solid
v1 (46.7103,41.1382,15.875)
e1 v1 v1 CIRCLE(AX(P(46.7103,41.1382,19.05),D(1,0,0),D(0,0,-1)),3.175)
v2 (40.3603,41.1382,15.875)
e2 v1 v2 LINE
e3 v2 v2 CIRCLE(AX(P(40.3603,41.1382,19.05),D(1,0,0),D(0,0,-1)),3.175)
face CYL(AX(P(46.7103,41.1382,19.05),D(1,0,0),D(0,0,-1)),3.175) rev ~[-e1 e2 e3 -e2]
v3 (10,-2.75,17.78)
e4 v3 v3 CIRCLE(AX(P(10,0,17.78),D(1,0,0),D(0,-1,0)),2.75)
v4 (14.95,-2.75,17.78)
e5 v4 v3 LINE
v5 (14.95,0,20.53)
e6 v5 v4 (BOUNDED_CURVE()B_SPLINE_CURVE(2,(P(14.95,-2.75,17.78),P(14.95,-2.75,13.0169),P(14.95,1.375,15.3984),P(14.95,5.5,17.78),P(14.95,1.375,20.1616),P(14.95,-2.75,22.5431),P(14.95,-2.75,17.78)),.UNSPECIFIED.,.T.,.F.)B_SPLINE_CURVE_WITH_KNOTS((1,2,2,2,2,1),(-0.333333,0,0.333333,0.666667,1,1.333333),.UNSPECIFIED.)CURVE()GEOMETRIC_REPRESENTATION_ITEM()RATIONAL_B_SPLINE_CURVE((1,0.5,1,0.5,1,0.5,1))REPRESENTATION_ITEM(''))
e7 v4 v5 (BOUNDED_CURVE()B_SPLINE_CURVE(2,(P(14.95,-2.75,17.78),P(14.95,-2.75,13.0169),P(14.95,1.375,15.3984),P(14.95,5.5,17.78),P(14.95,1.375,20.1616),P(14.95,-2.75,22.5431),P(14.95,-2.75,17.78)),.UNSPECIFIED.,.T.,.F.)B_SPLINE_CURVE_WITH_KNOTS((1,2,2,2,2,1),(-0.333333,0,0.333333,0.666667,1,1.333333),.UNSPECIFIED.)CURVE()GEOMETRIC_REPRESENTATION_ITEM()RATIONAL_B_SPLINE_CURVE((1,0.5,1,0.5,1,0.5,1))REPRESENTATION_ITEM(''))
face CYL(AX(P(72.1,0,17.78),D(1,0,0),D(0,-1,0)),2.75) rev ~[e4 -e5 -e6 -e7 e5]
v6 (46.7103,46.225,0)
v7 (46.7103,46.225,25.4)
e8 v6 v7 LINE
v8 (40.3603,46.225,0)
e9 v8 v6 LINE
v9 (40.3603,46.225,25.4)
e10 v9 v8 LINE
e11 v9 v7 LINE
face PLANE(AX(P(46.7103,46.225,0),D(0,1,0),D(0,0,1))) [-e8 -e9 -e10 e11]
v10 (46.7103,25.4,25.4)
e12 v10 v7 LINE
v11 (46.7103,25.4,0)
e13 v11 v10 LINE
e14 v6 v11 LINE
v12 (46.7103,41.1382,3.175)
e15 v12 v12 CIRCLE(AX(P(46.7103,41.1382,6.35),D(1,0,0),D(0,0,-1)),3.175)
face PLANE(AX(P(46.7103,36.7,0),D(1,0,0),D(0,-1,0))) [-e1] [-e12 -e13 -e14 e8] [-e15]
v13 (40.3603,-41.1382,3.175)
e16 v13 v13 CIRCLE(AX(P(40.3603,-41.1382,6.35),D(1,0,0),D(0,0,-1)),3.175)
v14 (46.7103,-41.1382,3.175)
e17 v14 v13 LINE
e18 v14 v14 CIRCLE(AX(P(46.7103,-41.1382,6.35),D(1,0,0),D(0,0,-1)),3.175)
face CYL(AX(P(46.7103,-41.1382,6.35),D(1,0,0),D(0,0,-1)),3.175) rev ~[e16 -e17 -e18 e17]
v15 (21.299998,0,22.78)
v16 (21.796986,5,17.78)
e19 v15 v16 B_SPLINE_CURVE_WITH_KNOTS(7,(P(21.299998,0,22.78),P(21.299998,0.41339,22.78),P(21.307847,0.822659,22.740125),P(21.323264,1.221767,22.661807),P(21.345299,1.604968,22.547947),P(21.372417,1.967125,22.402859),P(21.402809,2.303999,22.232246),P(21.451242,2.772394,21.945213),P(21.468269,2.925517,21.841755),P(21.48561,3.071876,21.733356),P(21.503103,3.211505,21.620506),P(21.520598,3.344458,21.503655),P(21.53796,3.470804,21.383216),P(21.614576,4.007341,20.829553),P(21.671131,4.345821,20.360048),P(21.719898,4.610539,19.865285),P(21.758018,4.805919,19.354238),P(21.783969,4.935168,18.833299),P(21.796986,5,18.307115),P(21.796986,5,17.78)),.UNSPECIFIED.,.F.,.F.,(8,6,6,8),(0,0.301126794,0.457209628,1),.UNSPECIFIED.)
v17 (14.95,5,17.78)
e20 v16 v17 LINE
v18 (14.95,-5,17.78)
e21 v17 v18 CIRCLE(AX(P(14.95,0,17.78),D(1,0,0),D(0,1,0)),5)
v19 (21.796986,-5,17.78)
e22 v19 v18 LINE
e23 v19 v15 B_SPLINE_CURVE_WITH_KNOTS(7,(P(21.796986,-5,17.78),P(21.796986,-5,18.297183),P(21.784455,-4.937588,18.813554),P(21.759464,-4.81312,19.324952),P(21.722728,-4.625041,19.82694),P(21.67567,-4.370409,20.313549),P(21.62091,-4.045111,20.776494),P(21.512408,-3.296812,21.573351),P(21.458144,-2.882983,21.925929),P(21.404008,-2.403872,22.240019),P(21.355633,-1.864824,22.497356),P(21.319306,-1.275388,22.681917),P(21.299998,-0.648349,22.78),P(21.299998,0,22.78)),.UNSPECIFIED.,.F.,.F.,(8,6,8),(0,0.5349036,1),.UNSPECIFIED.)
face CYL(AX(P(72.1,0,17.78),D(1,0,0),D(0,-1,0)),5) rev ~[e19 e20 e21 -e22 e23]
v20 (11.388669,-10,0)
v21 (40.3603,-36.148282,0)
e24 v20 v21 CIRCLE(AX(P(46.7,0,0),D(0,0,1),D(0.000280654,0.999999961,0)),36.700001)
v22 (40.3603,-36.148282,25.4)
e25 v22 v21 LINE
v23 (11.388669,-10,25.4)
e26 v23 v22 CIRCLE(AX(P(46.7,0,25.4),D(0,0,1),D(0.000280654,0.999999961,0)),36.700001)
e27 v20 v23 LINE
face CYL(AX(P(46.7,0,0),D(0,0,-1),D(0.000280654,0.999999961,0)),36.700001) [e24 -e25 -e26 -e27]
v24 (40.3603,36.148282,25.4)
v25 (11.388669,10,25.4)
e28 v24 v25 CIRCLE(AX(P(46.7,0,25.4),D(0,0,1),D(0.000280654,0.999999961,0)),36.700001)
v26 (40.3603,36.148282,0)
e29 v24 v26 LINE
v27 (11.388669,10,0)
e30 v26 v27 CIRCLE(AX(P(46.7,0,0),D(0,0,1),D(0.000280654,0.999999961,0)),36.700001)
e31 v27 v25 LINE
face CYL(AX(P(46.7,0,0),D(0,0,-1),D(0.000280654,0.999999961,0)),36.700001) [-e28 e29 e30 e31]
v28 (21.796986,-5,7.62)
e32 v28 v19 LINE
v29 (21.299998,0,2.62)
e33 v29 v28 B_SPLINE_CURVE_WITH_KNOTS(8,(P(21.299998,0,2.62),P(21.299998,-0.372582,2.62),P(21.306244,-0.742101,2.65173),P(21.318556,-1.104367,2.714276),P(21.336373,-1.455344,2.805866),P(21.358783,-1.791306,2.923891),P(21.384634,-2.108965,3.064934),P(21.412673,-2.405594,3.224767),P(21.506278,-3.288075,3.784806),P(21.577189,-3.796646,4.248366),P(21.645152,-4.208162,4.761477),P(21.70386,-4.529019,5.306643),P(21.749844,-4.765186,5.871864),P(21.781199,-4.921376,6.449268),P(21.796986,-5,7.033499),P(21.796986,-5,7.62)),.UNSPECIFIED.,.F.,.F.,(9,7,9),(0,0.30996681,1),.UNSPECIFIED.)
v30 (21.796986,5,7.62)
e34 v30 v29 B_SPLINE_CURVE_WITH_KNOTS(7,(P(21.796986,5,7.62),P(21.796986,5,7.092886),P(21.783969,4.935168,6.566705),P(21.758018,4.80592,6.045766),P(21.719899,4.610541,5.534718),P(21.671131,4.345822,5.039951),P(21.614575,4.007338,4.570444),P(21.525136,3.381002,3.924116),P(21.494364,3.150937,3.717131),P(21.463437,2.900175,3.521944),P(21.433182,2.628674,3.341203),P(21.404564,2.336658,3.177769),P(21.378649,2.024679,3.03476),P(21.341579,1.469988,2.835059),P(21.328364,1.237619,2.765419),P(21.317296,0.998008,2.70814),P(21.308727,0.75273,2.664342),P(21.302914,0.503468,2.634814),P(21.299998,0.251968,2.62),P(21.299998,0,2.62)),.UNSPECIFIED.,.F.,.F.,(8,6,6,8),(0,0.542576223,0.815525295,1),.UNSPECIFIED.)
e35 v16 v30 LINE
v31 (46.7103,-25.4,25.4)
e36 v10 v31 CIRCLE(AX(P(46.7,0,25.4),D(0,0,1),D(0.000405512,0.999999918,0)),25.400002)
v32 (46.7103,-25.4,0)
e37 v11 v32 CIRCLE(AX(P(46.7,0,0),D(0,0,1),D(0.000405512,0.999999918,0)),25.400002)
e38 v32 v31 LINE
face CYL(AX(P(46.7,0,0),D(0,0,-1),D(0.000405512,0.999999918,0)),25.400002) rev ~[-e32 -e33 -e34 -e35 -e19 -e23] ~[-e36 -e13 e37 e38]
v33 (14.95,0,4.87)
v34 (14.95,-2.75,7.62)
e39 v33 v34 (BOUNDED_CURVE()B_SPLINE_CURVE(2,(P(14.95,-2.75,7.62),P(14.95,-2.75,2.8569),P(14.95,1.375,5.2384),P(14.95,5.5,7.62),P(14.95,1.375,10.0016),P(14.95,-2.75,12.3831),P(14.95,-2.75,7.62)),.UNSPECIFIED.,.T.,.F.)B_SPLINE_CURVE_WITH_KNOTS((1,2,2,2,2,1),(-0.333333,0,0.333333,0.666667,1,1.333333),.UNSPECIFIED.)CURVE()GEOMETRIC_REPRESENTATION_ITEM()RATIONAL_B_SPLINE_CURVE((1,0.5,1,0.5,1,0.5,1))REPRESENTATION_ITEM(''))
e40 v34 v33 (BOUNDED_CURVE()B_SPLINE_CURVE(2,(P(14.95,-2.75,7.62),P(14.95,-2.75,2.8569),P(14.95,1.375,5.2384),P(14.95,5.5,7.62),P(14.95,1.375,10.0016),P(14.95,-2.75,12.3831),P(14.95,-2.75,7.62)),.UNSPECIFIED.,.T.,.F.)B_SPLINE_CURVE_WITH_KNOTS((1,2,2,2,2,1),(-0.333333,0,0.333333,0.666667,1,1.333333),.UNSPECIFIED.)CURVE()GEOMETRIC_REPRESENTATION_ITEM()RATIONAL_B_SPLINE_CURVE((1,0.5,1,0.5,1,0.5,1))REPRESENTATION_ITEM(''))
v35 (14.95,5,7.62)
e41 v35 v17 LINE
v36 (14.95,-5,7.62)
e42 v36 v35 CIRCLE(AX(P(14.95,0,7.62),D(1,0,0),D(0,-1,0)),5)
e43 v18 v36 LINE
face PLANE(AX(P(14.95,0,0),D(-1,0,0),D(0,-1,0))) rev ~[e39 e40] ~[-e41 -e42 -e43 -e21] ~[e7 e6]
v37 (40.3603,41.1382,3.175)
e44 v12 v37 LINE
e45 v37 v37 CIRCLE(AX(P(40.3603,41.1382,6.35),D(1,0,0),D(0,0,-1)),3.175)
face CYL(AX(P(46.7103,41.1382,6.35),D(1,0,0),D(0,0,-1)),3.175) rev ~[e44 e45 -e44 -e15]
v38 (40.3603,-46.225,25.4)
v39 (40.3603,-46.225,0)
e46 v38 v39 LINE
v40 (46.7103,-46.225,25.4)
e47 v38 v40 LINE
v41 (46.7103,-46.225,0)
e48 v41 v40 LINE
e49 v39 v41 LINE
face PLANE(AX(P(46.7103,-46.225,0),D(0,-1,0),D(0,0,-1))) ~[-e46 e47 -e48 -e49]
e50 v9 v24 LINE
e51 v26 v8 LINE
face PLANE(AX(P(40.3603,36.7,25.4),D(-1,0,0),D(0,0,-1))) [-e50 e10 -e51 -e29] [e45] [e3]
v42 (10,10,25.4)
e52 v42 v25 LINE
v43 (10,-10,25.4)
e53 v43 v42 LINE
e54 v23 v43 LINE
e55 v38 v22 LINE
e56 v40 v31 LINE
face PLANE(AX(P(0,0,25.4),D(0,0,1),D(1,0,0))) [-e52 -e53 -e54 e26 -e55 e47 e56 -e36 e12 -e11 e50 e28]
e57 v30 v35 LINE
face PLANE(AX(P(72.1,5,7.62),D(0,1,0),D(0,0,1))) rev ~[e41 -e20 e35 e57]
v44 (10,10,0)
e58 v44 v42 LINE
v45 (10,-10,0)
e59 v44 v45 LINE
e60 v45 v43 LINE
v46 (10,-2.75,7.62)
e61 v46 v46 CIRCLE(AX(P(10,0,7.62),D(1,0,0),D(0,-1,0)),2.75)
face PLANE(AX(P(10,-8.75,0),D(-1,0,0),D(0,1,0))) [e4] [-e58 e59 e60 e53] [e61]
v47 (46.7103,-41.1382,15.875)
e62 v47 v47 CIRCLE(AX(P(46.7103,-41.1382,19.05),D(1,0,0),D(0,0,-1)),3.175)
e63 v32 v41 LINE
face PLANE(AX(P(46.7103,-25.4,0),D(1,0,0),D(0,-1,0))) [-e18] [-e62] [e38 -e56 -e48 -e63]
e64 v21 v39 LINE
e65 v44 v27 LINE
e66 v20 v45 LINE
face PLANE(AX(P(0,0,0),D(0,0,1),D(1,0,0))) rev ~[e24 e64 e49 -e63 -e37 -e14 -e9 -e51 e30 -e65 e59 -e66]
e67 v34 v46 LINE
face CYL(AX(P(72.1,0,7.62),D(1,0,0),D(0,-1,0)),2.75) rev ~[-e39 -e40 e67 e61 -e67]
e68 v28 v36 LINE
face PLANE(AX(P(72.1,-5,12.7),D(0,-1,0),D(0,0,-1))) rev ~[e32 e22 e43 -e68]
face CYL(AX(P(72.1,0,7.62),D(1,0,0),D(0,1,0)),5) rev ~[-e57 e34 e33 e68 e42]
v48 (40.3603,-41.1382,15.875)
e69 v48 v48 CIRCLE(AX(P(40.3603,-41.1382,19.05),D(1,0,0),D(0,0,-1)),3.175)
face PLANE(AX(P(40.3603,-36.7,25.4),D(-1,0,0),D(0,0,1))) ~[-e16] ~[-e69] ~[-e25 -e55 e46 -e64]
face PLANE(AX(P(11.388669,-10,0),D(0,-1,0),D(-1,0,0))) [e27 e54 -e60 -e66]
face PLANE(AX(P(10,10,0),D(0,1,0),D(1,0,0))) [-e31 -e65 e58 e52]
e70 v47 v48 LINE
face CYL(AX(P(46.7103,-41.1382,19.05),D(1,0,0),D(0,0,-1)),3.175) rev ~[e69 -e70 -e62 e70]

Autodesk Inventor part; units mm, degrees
sketch "Sketch1" plane through (0, 0, 0) normal (0, 0, 1) x (1, 0, 0)
  arc A0 (-10, -8.75) -> (-8.75, -10) centre (-8.75, -8.75) ccw projected
  line L0 (-8.75, -10) -> (-3.6, -10) projected
  line L1 (-3.6, -10) -> (-3.1, -9.5) projected
  line L2 (-3.1, -9.5) -> (-3.1, -8.4) projected
  line L3 (-3.1, -8.4) -> (-5.5, -8.4) projected
  line L4 (-5.5, -8.4) -> (-5.5, -6.466) projected
  line L5 (-5.5, -6.466) -> (-3.134, -4.1) projected
  line L6 (-3.134, -4.1) -> (3.134, -4.1) projected
  line L7 (3.134, -4.1) -> (5.5, -6.466) projected
  line L8 (5.5, -6.466) -> (5.5, -8.4) projected
  line L9 (5.5, -8.4) -> (3.1, -8.4) projected
  line L10 (3.1, -8.4) -> (3.1, -9.5) projected
  line L11 (3.1, -9.5) -> (3.6, -10) projected
  line L12 (3.6, -10) -> (8.75, -10) projected
  arc A1 (8.75, -10) -> (10, -8.75) centre (8.75, -8.75) ccw projected
  line L13 (10, -8.75) -> (10, -3.6) projected
  line L14 (10, -3.6) -> (9.5, -3.1) projected
  line L15 (9.5, -3.1) -> (8.4, -3.1) projected
  line L16 (8.4, -3.1) -> (8.4, -5.5) projected
  line L17 (8.4, -5.5) -> (6.466, -5.5) projected
  line L18 (6.466, -5.5) -> (4.1, -3.134) projected
  line L19 (4.1, -3.134) -> (4.1, 3.134) projected
  line L20 (4.1, 3.134) -> (6.466, 5.5) projected
  line L21 (6.466, 5.5) -> (8.4, 5.5) projected
  line L22 (8.4, 5.5) -> (8.4, 3.1) projected
  line L23 (8.4, 3.1) -> (9.5, 3.1) projected
  line L24 (9.5, 3.1) -> (10, 3.6) projected
  line L25 (10, 3.6) -> (10, 8.75) projected
  arc A2 (10, 8.75) -> (8.75, 10) centre (8.75, 8.75) ccw projected
  line L26 (8.75, 10) -> (3.6, 10) projected
  line L27 (3.6, 10) -> (3.1, 9.5) projected
  line L28 (3.1, 9.5) -> (3.1, 8.4) projected
  line L29 (3.1, 8.4) -> (5.5, 8.4) projected
  line L30 (5.5, 8.4) -> (5.5, 6.466) projected
  line L31 (5.5, 6.466) -> (3.134, 4.1) projected
  line L32 (3.134, 4.1) -> (-3.134, 4.1) projected
  line L33 (-3.134, 4.1) -> (-5.5, 6.466) projected
  line L34 (-5.5, 6.466) -> (-5.5, 8.4) projected
  line L35 (-5.5, 8.4) -> (-3.1, 8.4) projected
  line L36 (-3.1, 8.4) -> (-3.1, 9.5) projected
  line L37 (-3.1, 9.5) -> (-3.6, 10) projected
  line L38 (-3.6, 10) -> (-8.75, 10) projected
  arc A3 (-8.75, 10) -> (-10, 8.75) centre (-8.75, 8.75) ccw projected
  line L39 (-10, 8.75) -> (-10, 3.6) projected
  line L40 (-10, 3.6) -> (-9.5, 3.1) projected
  line L41 (-9.5, 3.1) -> (-8.4, 3.1) projected
  line L42 (-8.4, 3.1) -> (-8.4, 5.5) projected
  line L43 (-8.4, 5.5) -> (-6.466, 5.5) projected
  line L44 (-6.466, 5.5) -> (-4.1, 3.134) projected
  line L45 (-4.1, 3.134) -> (-4.1, -3.134) projected
  line L46 (-4.1, -3.134) -> (-6.466, -5.5) projected
  line L47 (-6.466, -5.5) -> (-8.4, -5.5) projected
  line L48 (-8.4, -5.5) -> (-8.4, -3.1) projected
  line L49 (-8.4, -3.1) -> (-9.5, -3.1) projected
  line L50 (-9.5, -3.1) -> (-10, -3.6) projected
  line L51 (-10, -3.6) -> (-10, -8.75) projected
  circle A4 centre (0, 0) radius 2.5 projected
  circle A5 centre (46.7, 0) radius 4.5 projected
  arc A6 (46.7103, 25.4) -> (46.7103, -25.4) centre (46.7, 0) ccw
  line L52 (10, 10) -> (16.35, 10)
  line L53 (16.35, 10) -> (16.35, -10)
  line L54 (16.35, -10) -> (10, -10)
  line L55 (10, -10) -> (10, 10)
  arc A7 (46.7103, 36.7) -> (46.7103, -36.7) centre (46.7, 0) ccw
  line L56 (46.7103, 36.7) -> (46.7103, 25.4)
  line L57 (46.7103, -25.4) -> (46.7103, -36.7)
  dimension "d0" = 50.8
  dimension "d1" = 20
  dimension "d2" = 6.35
extrude "Extrusion1" add sketch "Sketch1" along normal blind 25.4 contours L13 L55 A7 L54 | L55 L25 L52 A7 | A7 L52 L53 L54 | L54 L53 L52 A7 L56 A6 L57
ref_plane "Work Plane1" through (46.7103, 36.7, 0) normal (0, 1, 0) x (0, 0, 1)
sketch "Sketch2" plane through (46.7103, 36.7, 0) normal (0, 1, 0) x (0, 0, 1)
  line L0 (0, 0) -> (25.4, 0) projected
  line L1 (25.4, -35.3216) -> (25.4, 0) projected
  line L2 (0, 0) -> (25.4, 0)
  line L3 (25.4, 0) -> (25.4, -6.35)
  line L4 (25.4, -6.35) -> (0, -6.35)
  line L5 (0, -6.35) -> (0, 0)
  point P0 (0, -46.7103)
  dimension "d6" = 6.35
extrude "Extrusion2" add sketch "Sketch2" along normal mid plane 19.05
ref_plane "Work Plane2" through (10, 0, 0) normal (0, 1, 0) x (1, 0, 0)
mirror "Mirror1" about plane through (10, 0, 0) normal (0, 1, 0) of "Extrusion2"
sketch "Sketch3" plane through (46.7103, -25.4, 25.4) normal (1, 0, 0) x (0, 0, -1)
  circle A0 centre (19.05, -15.7382) radius 3.175 projected
  circle A1 centre (6.35, -15.7382) radius 3.175 projected
  circle A2 centre (6.35, 66.5382) radius 3.175 projected
  circle A3 centre (19.05, 66.5382) radius 3.175 projected
  point P0 (25.4, 25.4)
extrude "Extrusion3" cut sketch "Sketch3" against normal through all
ref_plane "Work Plane4" through (21.3, 0, 0) normal (-1, 0, 0) x (0, -1, 0)
ref_plane "Work Plane3" through (72.1, 0, 0) normal (-1, 0, 0) x (0, -1, 0)
sketch "Sketch4" plane through (72.1, 0, 0) normal (-1, 0, 0) x (0, -1, 0)
  line L0 (0, 0) -> (0, 25.4) construction
  line L1 (-10, 25.4) -> (10, 25.4) projected
  circle A0 centre (0, 17.78) radius 2.75
  circle A1 centre (0, 7.62) radius 2.75
  line L2 (-25.4, 0) -> (25.4, 0) projected
  dimension "d13" = 5.5
  dimension "d14" = 7.62
  dimension "d15" = 7.62
extrude "Extrusion4" cut sketch "Sketch4" along normal through all
sketch "Sketch5" plane through (72.1, 0, 0) normal (-1, 0, 0) x (0, -1, 0)
  spline S0 degree 2 poles (2.75, 17.78) (2.75, 13.0169) (-1.375, 15.3984) (-5.5, 17.78) (-1.375, 20.1616) (2.75, 22.5431) (2.75, 17.78) knots 0 0 0 0.333333 0.333333 0.666667 0.666667 1 1 1 weights 1 0.5 1 0.5 1 0.5 1 projected
  spline S1 degree 2 poles (2.75, 7.62) (2.75, 2.8569) (-1.375, 5.2384) (-5.5, 7.62) (-1.375, 10.0016) (2.75, 12.3831) (2.75, 7.62) knots 0 0 0 0.333333 0.333333 0.666667 0.666667 1 1 1 weights 1 0.5 1 0.5 1 0.5 1 projected
  circle A0 centre (0, 7.62) radius 2.75 projected
  line L0 (5, 12.7) -> (5, 7.62)
  arc A1 (-5, 7.62) -> (5, 7.62) centre (0, 7.62) ccw
  spline S2 degree 7 poles (2.75, 17.78) (2.75, 18.0802) (2.7118, 18.38) (2.6355, 18.6767) (2.52, 18.9674) (2.3634, 19.248) (2.1631, 19.5126) (1.7177, 19.9454) (1.4837, 20.1274) (1.2158, 20.2864) (0.9183, 20.4129) (0.5978, 20.4988) (0.2624, 20.5386) (-0.4242, 20.519) (-0.7584, 20.4587) (-1.0728, 20.3535) (-1.3607, 20.2102) (-1.617, 20.0371) (-1.8389, 19.8434) (-2.2394, 19.407) (-2.4132, 19.1552) (-2.5494, 18.8907) (-2.6501, 18.6181) (-2.7166, 18.3405) (-2.75, 18.0604) (-2.75, 17.4798) (-2.7118, 17.18) (-2.6355, 16.8833) (-2.52, 16.5926) (-2.3634, 16.312) (-2.1631, 16.0474) (-1.7177, 15.6146) (-1.4837, 15.4326) (-1.2158, 15.2736) (-0.9183, 15.1471) (-0.5978, 15.0612) (-0.2624, 15.0214) (0.4242, 15.041) (0.7584, 15.1013) (1.0728, 15.2065) (1.3607, 15.3498) (1.617, 15.5229) (1.8389, 15.7166) (2.2394, 16.153) (2.4132, 16.4048) (2.5494, 16.6693) (2.6501, 16.9419) (2.7166, 17.2195) (2.75, 17.4996) (2.75, 17.78) knots 0 0 0 0 0 0 0 0 0.14065 0.14065 0.14065 0.14065 0.14065 0.14065 0.254122 0.254122 0.254122 0.254122 0.254122 0.254122 0.369156 0.369156 0.369156 0.369156 0.369156 0.369156 0.500342 0.500342 0.500342 0.500342 0.500342 0.500342 0.640802 0.640802 0.640802 0.640802 0.640802 0.640802 0.754121 0.754121 0.754121 0.754121 0.754121 0.754121 0.869 0.869 0.869 0.869 0.869 0.869 1 1 1 1 1 1 1 1 projected
  line L1 (25.4, 0) -> (-25.4, 0) projected
  line L2 (-25.4, 0) -> (-25.4, 25.4) projected
  line L3 (25.4, 25.4) -> (-25.4, 25.4) projected
  line L4 (25.4, 0) -> (25.4, 25.4) projected
  line L5 (-10, 25.4) -> (10, 25.4) projected
  line L6 (0, 25.4) -> (0, 20.53)
  line L7 (0, 15.03) -> (0, 10.37) construction
  line L8 (0, 4.87) -> (0, 0)
  line L9 (-5.6857, 12.7) -> (9.2801, 12.7) construction
  line L10 (-5, 7.62) -> (-5, 12.7)
  line L11 (5, 12.7) -> (5, 17.78)
  arc A2 (5, 17.78) -> (-5, 17.78) centre (0, 17.78) ccw
  line L12 (-5, 17.78) -> (-5, 12.7)
extrude "Extrusion5" cut sketch "Sketch5" along normal blind 57.15 contours L0 A1 L10 L12 A2 L11
properties part number "DremelHolder"
